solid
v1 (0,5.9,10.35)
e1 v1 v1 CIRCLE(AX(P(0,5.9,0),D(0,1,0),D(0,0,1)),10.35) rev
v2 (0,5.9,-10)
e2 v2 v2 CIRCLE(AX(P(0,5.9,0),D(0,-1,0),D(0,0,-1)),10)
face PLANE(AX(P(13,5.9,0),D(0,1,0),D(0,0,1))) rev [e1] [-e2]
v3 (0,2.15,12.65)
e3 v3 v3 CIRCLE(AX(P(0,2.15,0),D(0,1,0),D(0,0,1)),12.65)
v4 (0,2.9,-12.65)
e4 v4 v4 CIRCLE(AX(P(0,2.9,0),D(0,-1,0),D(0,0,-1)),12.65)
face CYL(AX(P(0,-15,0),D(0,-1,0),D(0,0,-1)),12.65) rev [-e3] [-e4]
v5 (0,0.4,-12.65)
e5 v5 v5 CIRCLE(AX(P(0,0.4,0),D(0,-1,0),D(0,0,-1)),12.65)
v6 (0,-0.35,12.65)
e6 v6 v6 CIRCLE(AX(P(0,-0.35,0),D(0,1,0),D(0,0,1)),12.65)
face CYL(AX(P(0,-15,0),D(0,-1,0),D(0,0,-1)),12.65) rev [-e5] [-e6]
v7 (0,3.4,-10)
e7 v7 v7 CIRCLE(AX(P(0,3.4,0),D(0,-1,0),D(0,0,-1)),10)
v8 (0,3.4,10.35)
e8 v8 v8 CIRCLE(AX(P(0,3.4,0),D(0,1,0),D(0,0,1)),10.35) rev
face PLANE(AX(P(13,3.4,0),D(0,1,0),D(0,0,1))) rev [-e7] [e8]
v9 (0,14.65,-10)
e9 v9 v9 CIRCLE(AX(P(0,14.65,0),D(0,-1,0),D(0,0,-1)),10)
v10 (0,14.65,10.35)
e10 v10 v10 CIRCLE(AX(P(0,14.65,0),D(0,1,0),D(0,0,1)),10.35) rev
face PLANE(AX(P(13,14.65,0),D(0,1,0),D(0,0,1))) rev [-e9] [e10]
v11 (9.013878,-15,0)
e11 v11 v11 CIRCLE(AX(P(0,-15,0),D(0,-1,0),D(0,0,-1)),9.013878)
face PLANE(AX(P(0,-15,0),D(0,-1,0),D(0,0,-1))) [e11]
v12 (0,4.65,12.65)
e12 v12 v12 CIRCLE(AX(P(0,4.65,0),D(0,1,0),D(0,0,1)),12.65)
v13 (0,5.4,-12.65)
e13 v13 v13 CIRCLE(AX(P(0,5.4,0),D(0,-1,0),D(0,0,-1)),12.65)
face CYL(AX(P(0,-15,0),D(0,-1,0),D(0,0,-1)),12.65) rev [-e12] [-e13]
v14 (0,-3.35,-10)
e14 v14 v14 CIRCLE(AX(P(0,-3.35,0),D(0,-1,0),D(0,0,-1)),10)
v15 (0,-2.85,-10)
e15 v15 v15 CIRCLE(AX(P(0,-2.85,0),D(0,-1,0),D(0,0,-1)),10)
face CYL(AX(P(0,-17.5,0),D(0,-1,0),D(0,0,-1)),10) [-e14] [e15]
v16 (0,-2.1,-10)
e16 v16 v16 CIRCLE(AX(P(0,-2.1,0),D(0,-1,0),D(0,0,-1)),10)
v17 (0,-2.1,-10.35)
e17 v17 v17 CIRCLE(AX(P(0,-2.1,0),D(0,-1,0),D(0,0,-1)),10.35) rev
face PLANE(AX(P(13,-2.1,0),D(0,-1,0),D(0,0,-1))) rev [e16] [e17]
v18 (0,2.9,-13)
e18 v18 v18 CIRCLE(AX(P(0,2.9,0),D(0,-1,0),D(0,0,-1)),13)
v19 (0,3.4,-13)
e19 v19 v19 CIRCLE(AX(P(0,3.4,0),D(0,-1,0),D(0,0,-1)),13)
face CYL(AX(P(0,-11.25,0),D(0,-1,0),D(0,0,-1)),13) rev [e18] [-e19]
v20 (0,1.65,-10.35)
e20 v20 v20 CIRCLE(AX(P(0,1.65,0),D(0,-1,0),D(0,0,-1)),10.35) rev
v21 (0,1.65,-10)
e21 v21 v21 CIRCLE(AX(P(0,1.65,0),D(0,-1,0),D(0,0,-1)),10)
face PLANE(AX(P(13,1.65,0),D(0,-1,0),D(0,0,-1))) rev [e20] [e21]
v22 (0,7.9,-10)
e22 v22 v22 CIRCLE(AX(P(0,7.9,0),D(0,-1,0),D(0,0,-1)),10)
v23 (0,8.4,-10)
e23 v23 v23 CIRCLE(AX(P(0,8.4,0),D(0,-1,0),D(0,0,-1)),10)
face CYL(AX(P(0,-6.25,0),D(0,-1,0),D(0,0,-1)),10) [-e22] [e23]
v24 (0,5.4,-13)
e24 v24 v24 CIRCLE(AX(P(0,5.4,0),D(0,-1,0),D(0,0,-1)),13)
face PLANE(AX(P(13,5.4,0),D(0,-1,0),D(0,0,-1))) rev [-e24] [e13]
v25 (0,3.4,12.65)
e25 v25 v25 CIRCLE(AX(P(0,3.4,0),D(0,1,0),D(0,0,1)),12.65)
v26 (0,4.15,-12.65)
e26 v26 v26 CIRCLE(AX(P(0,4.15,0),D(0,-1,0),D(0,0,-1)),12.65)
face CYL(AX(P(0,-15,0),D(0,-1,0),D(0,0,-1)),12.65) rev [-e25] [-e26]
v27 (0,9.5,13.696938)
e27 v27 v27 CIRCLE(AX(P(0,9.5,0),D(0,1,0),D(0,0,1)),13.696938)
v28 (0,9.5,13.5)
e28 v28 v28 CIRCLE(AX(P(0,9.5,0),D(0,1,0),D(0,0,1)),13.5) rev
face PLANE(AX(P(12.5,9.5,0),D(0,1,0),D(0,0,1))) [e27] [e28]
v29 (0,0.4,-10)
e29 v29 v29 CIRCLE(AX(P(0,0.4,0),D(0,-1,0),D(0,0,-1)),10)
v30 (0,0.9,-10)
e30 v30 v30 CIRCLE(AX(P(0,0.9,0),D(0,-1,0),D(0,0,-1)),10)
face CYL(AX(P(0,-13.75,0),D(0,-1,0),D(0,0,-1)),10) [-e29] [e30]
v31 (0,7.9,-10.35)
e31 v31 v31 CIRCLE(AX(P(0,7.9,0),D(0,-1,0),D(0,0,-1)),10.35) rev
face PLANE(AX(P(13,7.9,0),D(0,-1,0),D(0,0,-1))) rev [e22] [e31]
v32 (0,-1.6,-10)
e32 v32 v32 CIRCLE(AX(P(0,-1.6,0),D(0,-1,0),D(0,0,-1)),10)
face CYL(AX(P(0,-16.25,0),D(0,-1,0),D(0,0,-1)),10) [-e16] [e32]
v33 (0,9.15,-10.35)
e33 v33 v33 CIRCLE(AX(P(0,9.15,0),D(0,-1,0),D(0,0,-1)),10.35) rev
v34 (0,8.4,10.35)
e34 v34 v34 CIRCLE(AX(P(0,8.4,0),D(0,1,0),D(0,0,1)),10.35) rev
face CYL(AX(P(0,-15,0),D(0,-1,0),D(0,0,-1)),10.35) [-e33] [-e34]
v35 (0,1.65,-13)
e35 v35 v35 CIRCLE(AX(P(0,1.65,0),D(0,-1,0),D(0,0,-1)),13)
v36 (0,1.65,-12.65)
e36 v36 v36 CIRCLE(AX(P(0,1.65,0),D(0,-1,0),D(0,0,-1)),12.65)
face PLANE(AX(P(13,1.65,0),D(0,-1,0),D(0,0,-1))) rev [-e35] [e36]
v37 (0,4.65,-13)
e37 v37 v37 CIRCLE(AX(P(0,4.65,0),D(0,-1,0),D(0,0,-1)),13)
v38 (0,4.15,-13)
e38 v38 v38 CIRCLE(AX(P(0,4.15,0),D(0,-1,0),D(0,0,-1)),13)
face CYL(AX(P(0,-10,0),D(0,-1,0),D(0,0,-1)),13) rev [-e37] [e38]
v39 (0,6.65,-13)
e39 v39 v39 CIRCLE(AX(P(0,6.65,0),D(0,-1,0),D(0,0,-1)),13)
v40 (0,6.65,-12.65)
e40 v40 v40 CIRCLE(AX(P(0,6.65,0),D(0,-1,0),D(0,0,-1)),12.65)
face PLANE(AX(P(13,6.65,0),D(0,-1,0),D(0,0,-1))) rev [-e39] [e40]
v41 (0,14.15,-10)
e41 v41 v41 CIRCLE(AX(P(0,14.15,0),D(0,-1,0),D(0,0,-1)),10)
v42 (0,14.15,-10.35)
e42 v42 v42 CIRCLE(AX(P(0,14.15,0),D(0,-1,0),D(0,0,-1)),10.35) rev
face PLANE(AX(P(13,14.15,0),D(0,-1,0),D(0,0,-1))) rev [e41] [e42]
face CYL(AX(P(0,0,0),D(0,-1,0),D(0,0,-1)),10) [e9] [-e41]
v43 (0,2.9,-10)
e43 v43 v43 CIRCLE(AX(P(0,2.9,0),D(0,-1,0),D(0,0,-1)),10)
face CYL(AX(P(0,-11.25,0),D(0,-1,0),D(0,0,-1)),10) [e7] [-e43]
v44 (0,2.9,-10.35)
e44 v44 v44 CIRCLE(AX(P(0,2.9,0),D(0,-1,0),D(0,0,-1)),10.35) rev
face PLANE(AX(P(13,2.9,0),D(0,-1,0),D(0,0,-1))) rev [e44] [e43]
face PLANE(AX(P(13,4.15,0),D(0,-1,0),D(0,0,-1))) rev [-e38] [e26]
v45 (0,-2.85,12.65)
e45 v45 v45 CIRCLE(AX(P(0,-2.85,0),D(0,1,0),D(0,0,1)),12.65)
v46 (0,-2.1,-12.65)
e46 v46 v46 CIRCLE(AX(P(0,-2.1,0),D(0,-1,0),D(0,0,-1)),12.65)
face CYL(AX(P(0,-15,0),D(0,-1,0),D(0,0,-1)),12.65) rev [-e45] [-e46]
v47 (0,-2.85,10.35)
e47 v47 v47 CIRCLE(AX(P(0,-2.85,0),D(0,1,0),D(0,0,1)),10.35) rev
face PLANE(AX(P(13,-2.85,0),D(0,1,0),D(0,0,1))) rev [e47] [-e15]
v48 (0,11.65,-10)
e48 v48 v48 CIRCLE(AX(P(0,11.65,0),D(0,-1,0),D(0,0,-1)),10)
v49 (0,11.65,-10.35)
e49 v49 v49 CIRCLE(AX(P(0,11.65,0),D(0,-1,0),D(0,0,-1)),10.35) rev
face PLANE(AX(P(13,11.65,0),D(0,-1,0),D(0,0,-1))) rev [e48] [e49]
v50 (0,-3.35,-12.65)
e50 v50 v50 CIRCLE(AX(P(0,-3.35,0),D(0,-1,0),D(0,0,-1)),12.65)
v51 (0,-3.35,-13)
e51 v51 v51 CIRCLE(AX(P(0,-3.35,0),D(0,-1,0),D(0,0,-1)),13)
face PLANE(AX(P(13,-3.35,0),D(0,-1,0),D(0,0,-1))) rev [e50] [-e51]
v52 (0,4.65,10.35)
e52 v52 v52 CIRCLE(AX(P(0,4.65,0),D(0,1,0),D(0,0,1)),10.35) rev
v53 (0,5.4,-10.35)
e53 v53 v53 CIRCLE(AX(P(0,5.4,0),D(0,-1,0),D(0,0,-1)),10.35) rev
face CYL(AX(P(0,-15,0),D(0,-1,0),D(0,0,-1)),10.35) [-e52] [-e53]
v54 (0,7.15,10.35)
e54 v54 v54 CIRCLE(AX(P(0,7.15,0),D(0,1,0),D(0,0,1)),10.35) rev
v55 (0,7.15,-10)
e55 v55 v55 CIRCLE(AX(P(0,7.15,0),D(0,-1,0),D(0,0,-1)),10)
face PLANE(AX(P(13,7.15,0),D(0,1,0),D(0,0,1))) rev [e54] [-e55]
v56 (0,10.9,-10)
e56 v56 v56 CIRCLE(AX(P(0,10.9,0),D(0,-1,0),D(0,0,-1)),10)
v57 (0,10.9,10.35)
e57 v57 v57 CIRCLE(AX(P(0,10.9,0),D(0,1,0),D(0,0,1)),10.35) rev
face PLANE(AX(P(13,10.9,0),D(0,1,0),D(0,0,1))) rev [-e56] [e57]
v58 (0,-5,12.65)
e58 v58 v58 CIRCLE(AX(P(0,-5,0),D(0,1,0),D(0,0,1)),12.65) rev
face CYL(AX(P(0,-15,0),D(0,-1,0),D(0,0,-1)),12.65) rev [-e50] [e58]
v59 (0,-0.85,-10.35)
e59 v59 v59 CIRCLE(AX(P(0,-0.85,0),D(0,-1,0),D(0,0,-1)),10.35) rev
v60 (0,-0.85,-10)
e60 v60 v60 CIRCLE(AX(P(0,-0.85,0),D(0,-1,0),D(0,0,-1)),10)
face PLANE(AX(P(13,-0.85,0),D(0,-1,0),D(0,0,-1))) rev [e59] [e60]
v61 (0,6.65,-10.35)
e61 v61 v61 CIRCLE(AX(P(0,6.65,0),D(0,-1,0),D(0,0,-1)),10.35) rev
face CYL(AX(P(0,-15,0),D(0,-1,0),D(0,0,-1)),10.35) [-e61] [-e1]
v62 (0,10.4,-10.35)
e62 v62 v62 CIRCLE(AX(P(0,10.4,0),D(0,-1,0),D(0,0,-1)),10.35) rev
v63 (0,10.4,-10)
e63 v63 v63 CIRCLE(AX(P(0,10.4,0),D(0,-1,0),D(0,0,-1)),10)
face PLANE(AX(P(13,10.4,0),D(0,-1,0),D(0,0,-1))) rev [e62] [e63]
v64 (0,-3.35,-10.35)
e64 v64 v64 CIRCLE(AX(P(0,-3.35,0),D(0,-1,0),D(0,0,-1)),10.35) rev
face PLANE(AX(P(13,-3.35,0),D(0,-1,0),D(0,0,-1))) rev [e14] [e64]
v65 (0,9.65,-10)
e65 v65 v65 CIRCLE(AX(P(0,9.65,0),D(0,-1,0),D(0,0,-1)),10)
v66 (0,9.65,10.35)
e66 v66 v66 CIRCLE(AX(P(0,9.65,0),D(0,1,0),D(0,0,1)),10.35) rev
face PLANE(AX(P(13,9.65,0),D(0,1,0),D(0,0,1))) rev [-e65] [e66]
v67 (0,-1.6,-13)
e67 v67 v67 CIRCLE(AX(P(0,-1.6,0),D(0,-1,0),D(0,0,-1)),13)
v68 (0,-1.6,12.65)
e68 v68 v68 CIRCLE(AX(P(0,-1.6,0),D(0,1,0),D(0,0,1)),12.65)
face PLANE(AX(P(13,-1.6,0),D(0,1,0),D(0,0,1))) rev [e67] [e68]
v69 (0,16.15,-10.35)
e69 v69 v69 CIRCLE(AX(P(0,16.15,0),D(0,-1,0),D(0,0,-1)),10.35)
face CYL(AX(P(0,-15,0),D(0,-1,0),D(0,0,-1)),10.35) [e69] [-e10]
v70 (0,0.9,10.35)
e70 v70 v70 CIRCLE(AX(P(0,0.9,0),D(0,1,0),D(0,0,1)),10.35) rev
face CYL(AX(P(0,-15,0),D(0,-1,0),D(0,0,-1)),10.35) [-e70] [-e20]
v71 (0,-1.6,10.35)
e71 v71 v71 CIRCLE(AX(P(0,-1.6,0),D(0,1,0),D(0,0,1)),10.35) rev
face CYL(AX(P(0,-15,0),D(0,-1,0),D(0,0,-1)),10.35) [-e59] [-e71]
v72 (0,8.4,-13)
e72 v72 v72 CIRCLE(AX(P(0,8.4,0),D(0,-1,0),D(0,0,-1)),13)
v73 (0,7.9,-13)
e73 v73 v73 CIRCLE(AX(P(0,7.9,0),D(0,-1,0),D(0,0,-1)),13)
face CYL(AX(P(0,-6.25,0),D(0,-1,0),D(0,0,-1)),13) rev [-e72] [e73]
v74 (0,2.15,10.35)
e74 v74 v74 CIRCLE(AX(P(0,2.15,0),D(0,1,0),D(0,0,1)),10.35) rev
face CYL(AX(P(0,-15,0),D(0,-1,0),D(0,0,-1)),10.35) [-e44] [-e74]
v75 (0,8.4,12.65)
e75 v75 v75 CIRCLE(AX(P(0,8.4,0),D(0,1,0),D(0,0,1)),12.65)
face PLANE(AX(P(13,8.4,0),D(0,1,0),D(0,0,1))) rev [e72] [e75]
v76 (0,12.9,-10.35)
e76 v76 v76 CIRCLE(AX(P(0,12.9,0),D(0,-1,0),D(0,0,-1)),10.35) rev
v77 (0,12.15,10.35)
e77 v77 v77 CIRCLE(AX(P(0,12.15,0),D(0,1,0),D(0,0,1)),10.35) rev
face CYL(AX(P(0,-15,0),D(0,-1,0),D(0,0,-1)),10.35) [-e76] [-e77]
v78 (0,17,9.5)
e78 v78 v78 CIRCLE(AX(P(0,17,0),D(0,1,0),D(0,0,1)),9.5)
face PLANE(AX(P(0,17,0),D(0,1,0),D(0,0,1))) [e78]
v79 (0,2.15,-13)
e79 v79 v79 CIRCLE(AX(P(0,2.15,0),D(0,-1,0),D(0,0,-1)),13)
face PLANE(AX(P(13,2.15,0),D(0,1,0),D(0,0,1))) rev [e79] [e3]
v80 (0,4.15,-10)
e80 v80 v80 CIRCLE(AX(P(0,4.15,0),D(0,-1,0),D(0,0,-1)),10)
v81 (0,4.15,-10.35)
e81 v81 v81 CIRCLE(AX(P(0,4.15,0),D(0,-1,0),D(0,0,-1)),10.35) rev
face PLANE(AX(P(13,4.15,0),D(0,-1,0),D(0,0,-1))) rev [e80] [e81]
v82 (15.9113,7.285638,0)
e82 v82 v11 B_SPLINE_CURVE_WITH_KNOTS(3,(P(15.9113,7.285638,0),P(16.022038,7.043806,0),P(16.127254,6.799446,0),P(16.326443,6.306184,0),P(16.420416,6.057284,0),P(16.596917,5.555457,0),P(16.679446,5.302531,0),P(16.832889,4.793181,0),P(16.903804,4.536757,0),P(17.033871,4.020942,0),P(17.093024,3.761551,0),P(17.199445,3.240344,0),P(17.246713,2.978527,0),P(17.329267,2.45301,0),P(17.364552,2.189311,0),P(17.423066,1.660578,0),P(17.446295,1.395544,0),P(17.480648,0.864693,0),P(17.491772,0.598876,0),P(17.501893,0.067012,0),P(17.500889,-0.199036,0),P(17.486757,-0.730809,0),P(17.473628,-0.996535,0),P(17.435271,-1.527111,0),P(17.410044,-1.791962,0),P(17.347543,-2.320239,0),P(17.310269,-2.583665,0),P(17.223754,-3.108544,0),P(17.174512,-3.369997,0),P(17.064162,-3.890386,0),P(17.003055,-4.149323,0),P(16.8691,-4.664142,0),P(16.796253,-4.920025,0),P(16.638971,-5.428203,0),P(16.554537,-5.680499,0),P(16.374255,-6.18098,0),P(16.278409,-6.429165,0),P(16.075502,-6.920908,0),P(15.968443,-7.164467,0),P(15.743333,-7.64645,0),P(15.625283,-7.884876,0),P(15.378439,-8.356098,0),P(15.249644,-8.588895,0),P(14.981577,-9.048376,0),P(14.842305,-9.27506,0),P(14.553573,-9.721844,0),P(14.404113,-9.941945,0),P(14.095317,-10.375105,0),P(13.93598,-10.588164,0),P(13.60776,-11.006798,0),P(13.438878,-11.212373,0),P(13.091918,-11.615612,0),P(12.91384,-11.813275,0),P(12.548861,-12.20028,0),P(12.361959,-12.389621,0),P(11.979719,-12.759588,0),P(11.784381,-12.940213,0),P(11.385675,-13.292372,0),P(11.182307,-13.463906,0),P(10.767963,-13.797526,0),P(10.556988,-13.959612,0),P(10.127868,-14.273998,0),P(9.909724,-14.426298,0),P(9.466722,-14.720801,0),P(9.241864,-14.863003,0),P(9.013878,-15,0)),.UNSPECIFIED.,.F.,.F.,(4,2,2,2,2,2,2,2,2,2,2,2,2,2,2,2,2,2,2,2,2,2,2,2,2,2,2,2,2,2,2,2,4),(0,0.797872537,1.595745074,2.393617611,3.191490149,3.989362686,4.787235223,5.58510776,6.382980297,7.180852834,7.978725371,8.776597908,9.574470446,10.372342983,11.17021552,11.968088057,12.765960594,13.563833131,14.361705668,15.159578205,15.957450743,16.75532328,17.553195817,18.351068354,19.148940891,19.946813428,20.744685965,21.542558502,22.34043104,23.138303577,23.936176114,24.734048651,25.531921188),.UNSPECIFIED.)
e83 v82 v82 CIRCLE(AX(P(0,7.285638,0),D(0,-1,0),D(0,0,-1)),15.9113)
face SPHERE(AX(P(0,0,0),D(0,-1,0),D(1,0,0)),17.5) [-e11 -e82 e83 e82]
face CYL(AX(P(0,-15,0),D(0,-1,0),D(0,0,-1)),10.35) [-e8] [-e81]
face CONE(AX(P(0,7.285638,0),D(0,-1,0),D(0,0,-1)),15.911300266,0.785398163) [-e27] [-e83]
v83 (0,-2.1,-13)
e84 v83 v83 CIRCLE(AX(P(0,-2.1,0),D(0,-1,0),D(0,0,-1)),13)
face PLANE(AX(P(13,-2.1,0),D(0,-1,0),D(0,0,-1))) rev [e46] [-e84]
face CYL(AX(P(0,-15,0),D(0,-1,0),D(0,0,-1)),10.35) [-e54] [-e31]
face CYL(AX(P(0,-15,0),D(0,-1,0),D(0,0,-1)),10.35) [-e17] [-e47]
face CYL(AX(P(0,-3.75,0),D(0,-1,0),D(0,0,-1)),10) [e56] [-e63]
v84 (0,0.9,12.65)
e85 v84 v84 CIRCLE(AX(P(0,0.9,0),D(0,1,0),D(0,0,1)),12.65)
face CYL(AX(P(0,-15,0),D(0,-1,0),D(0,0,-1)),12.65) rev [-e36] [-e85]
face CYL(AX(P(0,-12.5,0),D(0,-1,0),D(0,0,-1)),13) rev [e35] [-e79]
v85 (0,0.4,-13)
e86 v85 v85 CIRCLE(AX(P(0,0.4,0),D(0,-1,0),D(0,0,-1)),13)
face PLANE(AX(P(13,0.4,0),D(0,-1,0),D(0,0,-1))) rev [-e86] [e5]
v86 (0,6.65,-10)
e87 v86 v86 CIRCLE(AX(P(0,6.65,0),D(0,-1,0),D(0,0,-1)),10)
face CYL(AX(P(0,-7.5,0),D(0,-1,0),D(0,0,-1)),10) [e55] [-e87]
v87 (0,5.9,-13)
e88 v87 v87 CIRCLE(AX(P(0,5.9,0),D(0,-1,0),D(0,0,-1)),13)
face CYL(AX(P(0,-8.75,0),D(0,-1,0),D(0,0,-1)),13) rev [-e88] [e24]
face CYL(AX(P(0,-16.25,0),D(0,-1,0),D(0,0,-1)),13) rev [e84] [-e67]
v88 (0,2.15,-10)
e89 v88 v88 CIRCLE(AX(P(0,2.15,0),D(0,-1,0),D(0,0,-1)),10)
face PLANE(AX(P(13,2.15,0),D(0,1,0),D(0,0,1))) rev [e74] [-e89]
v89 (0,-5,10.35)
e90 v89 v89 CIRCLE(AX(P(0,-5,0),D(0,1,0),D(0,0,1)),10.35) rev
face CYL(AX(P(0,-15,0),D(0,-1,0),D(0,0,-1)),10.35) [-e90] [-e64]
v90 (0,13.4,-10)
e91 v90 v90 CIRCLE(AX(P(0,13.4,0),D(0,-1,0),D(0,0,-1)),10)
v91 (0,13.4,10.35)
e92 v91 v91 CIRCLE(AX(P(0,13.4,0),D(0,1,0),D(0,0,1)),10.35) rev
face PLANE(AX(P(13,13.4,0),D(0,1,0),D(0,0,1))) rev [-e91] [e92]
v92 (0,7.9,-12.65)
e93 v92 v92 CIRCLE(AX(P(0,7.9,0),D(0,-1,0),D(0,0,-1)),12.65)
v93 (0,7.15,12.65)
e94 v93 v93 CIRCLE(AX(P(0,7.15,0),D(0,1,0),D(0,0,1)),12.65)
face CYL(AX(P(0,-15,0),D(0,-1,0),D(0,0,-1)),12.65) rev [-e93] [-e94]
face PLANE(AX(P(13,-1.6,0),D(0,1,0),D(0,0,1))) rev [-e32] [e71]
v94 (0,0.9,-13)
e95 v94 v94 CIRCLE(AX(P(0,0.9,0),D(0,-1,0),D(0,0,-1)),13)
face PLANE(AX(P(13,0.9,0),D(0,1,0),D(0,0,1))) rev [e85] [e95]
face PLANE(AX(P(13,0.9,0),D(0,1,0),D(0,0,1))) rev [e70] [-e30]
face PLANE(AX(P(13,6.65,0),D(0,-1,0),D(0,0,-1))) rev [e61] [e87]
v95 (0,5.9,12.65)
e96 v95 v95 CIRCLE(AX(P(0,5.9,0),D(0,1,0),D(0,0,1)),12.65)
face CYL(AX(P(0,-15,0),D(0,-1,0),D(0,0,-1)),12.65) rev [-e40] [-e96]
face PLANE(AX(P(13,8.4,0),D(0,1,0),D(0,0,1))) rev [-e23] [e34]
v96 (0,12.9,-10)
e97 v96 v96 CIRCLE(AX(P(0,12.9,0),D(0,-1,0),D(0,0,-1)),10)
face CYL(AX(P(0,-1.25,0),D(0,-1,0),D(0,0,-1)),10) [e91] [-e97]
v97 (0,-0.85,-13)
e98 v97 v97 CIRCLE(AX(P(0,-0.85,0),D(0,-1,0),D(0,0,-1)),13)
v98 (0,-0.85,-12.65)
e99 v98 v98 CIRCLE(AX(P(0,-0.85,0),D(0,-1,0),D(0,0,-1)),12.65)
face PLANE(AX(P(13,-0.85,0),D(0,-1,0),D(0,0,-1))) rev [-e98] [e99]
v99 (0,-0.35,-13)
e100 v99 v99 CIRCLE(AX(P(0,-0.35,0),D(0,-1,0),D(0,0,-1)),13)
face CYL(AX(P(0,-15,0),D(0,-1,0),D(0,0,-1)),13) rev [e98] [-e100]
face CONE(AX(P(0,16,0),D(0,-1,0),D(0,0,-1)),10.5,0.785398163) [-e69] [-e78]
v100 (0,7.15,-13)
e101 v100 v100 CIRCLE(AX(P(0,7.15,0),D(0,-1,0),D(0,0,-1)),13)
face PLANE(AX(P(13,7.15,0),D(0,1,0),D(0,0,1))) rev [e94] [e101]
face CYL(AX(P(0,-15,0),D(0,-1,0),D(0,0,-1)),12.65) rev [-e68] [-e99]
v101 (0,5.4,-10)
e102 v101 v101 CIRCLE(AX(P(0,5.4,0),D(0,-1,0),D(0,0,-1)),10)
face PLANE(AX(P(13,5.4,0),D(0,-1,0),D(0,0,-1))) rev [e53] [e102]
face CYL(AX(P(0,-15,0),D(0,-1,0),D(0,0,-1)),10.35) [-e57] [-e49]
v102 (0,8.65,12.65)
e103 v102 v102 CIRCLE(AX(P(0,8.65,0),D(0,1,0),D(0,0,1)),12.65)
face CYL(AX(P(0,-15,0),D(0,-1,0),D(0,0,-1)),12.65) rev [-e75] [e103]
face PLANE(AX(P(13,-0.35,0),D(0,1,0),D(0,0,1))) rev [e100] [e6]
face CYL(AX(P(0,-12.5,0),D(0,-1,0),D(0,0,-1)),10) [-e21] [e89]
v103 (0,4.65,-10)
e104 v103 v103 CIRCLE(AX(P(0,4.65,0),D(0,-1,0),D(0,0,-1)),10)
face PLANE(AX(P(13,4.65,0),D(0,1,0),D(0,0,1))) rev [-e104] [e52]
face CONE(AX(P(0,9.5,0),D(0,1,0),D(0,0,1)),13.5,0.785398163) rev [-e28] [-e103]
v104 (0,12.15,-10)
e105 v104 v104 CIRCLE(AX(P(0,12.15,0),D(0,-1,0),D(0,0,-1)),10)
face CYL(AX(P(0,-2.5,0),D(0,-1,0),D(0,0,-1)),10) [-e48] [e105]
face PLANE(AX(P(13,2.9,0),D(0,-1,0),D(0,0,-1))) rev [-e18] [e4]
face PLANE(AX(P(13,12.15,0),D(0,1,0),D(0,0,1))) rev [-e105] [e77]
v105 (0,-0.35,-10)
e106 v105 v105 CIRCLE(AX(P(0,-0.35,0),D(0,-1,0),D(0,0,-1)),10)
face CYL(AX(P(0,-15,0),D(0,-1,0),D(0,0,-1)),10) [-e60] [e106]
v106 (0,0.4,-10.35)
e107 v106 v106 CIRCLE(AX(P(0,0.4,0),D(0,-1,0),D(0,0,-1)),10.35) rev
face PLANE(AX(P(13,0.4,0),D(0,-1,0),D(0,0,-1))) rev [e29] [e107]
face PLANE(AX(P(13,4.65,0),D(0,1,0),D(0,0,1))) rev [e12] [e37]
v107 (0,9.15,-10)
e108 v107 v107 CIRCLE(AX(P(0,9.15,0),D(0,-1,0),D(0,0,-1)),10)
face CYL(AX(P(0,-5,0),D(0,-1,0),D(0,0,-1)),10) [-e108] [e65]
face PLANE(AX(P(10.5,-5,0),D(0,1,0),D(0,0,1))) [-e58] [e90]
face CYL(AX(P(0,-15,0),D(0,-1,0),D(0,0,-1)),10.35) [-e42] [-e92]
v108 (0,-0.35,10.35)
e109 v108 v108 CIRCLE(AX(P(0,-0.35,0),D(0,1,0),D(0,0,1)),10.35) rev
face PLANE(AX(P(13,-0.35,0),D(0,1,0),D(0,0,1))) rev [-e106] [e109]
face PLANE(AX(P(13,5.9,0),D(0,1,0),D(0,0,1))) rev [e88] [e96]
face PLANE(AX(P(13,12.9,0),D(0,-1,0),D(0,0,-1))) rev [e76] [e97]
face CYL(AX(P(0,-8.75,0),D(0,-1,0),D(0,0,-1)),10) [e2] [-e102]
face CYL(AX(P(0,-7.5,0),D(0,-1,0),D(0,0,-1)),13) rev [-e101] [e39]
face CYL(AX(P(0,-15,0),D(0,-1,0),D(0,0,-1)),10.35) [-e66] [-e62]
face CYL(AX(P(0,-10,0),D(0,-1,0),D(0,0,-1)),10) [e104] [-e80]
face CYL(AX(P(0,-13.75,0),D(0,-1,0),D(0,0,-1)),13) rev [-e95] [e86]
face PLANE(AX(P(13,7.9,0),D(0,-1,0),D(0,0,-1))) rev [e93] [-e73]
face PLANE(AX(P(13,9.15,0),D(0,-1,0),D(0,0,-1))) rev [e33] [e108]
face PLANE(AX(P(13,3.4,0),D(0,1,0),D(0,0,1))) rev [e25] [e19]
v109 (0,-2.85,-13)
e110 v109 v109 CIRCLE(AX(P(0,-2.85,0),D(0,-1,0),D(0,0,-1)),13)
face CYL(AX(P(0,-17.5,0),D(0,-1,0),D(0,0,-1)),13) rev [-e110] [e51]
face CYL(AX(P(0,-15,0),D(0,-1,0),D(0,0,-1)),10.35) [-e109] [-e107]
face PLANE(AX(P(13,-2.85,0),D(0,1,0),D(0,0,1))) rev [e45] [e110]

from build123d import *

# Parameters (mm, degrees)
CHAMFER1_SIZE          = 1
MOVE_START             = -5
MOVE_FACE1_OUTLINE_R   = 12.65
MOVE_FACE1_OUTLINE_R_2 = 12.5
MOVE_FACE1_OUTLINE_R_3 = 10.5
MOVE_FACE1_OUTLINE_R_4 = 10.35
MOVE_FACE1_DEPTH       = 22
SKETCH2_W              = 3
SKETCH2_H              = 0.5
LPATTERN1_COUNT        = 15
LPATTERN1_PITCH        = 1.25


with BuildPart() as part:
    # Sketch1 → Revolve1 (revolve)
    with BuildSketch(Plane.XY, mode=Mode.PRIVATE) as revolve1_sk:
        with BuildLine():
            Line((0, -15), (0, 17))
            Line((0, 17), (10.5, 17))
            Line((10.5, 17), (10.5, -5))
            Line((10.5, -5), (12.5, -5))
            Line((12.5, -5), (12.5, 9.5))
            Line((12.5, 9.5), (14.696938457, 9.5))
            ThreePointArc((14.696938457, 9.5), (17.047381221, -3.954338567), (9.013878189, -15))
            Line((9.013878189, -15), (0, -15))
        make_face()
    revolve(revolve1_sk.sketch.rotate(Axis((0, -15, 0), (0, 1, 0)), 90), axis=Axis((0, -15, 0), (0, 1, 0)))

    # Chamfer1
    # the kernel refuses this chamfer: 3.367367181, 1 mm, written as the material it takes off along each edge
    with BuildSketch(Plane(origin=(0, 17, 0), x_dir=(0, 0, -1), z_dir=(1, 0, 0))) as chamfer1_piece_1:
        Polygon((10.5 - CHAMFER1_SIZE, 0), (10.5, -CHAMFER1_SIZE), (10.5, 0), align=None)
    revolve(axis=Axis((0, 17, 0), (0, 1, 0)), mode=Mode.SUBTRACT)
    with BuildSketch(Plane(origin=(0, 9.5, 0), x_dir=(0, 0, -1), z_dir=(1, 0, 0))) as chamfer1_piece_2:
        Polygon((12.5, -CHAMFER1_SIZE), (12.5 + CHAMFER1_SIZE, 0), (12.5, 0), align=None)
    revolve(axis=Axis((0, 9.5, 0), (0, 1, 0)), mode=Mode.SUBTRACT)
    with BuildSketch(Plane(origin=(0, 9.5, 0), x_dir=(0, 0, -1), z_dir=(1, 0, 0))) as chamfer1_piece_3:
        with BuildLine():
            Line((14.696938457 - CHAMFER1_SIZE, 0), (15.911300266, -2.214361809))
            ThreePointArc((15.911300266, -2.214361809), (15.375147387, -1.142079038), (14.696938457, 0))
            Line((14.696938457, 0), (14.696938457 - CHAMFER1_SIZE, 0))
        make_face()
    revolve(axis=Axis((0, 9.5, 0), (0, 1, 0)), mode=Mode.SUBTRACT)

    # Move Face1: read off the stored shape, not the designer's step
    # Move Face1 outline → Move Face1 (cut)
    # profile 1 of 2: a face of its own
    with BuildSketch(Plane(origin=(0, 0, 0), x_dir=(1, 0, 0), z_dir=(0, 1, 0)).offset(MOVE_START)):
        Circle(MOVE_FACE1_OUTLINE_R)
        Circle(MOVE_FACE1_OUTLINE_R_2, mode=Mode.SUBTRACT)
    # profile 2 of 2: a face of its own
    with BuildSketch(Plane(origin=(0, 0, 0), x_dir=(1, 0, 0), z_dir=(0, 1, 0)).offset(MOVE_START)):
        Circle(MOVE_FACE1_OUTLINE_R_3)
        Circle(MOVE_FACE1_OUTLINE_R_4, mode=Mode.SUBTRACT)
    extrude(amount=MOVE_FACE1_DEPTH, mode=Mode.SUBTRACT)

    # Sketch2 → Cut-Revolve1 (revolve, cut)
    with BuildSketch(Plane.XY):
        with Locations((11.5, 14.4)):
            Rectangle(SKETCH2_W, SKETCH2_H)
    cut_revolve1 = revolve(axis=Axis((0, 0, 0), (0, 1, 0)), mode=Mode.SUBTRACT)

    # LPattern1: Cut-Revolve1 ×15
    with Locations(*[(0, -i * LPATTERN1_PITCH, 0) for i in range(1, LPATTERN1_COUNT)]):
        add(cut_revolve1, mode=Mode.SUBTRACT)


solid = part.part
